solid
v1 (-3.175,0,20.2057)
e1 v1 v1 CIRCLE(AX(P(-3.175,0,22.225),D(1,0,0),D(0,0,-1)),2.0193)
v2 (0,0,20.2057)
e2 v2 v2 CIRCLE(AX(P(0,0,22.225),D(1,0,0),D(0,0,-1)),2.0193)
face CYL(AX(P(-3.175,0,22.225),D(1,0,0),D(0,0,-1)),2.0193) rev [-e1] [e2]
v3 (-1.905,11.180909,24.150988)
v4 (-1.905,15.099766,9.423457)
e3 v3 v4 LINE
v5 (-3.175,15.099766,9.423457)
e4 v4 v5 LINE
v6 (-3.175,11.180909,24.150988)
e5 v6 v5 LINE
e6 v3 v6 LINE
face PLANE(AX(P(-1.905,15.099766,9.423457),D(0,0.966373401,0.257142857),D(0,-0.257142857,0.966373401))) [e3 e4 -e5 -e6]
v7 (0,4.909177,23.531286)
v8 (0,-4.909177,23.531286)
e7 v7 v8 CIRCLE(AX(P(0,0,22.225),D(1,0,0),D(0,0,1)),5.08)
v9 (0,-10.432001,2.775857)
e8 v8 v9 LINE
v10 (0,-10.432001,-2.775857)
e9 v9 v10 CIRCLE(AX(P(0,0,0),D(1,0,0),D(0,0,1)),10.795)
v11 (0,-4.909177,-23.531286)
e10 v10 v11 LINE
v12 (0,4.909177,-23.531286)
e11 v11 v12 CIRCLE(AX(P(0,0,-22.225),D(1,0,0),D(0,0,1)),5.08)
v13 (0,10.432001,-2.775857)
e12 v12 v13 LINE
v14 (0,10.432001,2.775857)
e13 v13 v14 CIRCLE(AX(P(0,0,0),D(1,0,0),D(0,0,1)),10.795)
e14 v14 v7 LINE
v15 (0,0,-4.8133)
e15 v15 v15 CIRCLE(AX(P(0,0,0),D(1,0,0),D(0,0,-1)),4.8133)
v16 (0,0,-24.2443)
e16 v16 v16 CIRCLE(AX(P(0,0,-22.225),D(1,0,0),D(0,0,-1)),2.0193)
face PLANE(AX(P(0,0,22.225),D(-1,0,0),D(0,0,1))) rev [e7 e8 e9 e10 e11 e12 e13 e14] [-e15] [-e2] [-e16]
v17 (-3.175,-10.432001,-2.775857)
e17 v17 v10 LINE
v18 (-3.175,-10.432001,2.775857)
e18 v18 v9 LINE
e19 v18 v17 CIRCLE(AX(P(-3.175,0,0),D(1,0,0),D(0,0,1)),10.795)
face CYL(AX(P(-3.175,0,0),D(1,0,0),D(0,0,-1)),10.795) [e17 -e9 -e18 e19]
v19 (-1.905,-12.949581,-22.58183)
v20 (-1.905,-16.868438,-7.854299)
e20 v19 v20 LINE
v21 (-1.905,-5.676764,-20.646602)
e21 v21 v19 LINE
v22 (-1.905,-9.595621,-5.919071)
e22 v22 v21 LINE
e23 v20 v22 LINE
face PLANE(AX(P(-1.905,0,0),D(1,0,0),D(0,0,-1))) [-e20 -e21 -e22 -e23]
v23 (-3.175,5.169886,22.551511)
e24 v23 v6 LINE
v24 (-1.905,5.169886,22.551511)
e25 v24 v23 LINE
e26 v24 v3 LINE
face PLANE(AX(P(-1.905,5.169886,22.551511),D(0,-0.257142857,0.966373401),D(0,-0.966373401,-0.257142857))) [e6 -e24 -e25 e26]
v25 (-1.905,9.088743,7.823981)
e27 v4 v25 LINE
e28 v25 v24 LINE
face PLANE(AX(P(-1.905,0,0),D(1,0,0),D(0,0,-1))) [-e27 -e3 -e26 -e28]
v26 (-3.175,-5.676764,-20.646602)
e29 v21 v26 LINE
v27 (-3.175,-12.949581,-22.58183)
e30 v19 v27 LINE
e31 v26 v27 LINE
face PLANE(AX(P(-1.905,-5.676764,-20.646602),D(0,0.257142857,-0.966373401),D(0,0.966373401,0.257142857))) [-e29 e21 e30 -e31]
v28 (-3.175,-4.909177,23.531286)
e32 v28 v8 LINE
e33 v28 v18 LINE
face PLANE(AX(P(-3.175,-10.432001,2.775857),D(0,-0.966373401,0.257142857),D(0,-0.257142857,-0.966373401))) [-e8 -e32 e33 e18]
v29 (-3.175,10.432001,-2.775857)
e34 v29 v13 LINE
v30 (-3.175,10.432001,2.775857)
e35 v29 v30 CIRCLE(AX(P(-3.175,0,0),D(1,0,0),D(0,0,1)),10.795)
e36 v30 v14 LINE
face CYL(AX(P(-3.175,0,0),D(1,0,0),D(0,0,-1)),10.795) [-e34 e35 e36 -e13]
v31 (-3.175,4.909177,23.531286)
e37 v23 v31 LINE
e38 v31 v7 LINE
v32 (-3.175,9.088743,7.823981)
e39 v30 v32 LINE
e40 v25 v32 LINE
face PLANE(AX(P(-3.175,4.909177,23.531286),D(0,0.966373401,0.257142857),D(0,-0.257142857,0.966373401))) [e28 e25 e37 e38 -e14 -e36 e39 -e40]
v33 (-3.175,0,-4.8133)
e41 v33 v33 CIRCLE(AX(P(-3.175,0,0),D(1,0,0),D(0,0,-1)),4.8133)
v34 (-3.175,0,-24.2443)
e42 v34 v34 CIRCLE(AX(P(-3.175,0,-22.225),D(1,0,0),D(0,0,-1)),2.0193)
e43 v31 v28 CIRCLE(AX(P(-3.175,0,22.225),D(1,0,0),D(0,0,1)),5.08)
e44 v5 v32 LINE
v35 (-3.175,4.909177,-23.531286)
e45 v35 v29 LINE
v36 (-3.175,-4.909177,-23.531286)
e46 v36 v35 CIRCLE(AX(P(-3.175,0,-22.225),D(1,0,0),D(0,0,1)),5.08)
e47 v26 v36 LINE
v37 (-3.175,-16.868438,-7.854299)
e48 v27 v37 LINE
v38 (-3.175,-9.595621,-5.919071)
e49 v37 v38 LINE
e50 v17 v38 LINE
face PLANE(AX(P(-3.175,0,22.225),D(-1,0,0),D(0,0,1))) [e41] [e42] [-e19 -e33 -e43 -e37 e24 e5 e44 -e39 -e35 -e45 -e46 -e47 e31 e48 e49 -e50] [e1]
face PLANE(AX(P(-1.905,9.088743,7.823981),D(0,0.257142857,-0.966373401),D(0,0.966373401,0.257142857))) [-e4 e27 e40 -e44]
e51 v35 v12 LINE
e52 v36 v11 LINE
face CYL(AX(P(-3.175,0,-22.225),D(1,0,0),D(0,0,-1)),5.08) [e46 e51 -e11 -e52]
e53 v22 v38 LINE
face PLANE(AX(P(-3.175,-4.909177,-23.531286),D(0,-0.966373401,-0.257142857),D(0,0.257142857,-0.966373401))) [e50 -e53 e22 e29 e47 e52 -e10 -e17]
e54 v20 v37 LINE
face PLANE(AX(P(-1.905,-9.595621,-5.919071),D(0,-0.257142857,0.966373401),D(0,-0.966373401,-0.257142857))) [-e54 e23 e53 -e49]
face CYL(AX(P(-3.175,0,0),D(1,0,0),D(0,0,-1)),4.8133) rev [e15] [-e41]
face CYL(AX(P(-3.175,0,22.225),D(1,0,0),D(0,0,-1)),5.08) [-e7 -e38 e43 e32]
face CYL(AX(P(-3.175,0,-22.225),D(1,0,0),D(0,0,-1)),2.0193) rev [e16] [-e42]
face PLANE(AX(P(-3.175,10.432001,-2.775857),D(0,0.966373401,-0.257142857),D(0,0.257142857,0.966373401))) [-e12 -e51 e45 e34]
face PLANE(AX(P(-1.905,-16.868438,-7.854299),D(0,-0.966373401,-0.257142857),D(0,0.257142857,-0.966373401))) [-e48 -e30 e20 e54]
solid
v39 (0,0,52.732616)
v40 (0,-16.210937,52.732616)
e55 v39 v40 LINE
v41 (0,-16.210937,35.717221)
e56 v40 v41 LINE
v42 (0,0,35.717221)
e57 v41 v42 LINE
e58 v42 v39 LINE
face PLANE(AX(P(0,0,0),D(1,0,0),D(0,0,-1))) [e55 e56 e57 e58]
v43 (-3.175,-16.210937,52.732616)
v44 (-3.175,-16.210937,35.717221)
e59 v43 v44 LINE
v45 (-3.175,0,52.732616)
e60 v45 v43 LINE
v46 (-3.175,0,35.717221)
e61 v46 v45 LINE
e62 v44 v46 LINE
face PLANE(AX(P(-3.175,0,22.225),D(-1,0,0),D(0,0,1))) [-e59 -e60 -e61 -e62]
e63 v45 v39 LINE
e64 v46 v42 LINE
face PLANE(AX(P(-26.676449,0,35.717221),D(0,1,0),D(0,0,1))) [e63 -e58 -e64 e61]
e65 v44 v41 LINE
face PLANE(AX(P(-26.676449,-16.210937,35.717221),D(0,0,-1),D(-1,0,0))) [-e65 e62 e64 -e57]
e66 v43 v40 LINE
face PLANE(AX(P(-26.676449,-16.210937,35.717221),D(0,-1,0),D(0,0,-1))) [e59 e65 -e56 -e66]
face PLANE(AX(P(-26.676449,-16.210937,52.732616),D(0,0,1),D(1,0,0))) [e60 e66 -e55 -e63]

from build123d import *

# Parameters (mm, degrees)
SKETCH1_R           = 2.0193
SKETCH1_R_2         = 4.8133
BASE_FLANGE1_DEPTH  = 3.175
SKETCH2_W           = 17.015394269
SKETCH2_H           = 16.210936875
BOSS_EXTRUDE1_DEPTH = 3.175
BOSS_EXTRUDE2_DEPTH = 1.27


# Sheet-metal steps are written as plain solids
with BuildPart() as part:
    # Sketch1 → Base-Flange1 (new body)
    with BuildSketch(Plane(origin=(0, 0, 0), x_dir=(0, 0, -1), z_dir=(1, 0, 0))):
        with BuildLine():
            Line((-23.531285714, 4.909176879), (-2.775857143, 10.432000869))
            ThreePointArc((-2.775857143, 10.432000869), (0, 10.795), (2.775857143, 10.432000869))
            Line((2.775857143, 10.432000869), (23.531285714, 4.909176879))
            ThreePointArc((23.531285714, 4.909176879), (27.305, 0), (23.531285714, -4.909176879))
            Line((23.531285714, -4.909176879), (2.775857143, -10.432000869))
            ThreePointArc((2.775857143, -10.432000869), (0, -10.795), (-2.775857143, -10.432000869))
            Line((-2.775857143, -10.432000869), (-23.531285714, -4.909176879))
            ThreePointArc((-23.531285714, -4.909176879), (-27.305, 0), (-23.531285714, 4.909176879))
        make_face()
        with Locations((-22.225, 0)):
            Circle(SKETCH1_R, mode=Mode.SUBTRACT)
        with Locations((22.225, 0)):
            Circle(SKETCH1_R, mode=Mode.SUBTRACT)
        Circle(SKETCH1_R_2, mode=Mode.SUBTRACT)
    extrude(amount=-BASE_FLANGE1_DEPTH)

    # Sketch6 → Boss-Extrude2 (add)
    with BuildSketch(Plane.ZY.offset(3.175)):
        Polygon((-5.91907135, -9.595621183), (-20.646601988, -5.67676404), (-22.581830021, -12.949580859), (-7.854299383, -16.868438002), align=None)
        Polygon((7.823980768, 9.088742734), (22.551511406, 5.169885592), (24.150988111, 11.180909039), (9.423457473, 15.099766182), align=None)
    extrude(amount=-BOSS_EXTRUDE2_DEPTH)


with BuildPart() as body_2:
    # Sketch2 → Boss-Extrude1 (new body)
    with BuildSketch(Plane(origin=(0, 0, 0), x_dir=(0, 0, -1), z_dir=(1, 0, 0))):
        with Locations((-44.224918413, -8.105468438)):
            Rectangle(SKETCH2_W, SKETCH2_H)
    extrude(amount=-BOSS_EXTRUDE1_DEPTH)


solid = Compound([part.part, body_2.part])
